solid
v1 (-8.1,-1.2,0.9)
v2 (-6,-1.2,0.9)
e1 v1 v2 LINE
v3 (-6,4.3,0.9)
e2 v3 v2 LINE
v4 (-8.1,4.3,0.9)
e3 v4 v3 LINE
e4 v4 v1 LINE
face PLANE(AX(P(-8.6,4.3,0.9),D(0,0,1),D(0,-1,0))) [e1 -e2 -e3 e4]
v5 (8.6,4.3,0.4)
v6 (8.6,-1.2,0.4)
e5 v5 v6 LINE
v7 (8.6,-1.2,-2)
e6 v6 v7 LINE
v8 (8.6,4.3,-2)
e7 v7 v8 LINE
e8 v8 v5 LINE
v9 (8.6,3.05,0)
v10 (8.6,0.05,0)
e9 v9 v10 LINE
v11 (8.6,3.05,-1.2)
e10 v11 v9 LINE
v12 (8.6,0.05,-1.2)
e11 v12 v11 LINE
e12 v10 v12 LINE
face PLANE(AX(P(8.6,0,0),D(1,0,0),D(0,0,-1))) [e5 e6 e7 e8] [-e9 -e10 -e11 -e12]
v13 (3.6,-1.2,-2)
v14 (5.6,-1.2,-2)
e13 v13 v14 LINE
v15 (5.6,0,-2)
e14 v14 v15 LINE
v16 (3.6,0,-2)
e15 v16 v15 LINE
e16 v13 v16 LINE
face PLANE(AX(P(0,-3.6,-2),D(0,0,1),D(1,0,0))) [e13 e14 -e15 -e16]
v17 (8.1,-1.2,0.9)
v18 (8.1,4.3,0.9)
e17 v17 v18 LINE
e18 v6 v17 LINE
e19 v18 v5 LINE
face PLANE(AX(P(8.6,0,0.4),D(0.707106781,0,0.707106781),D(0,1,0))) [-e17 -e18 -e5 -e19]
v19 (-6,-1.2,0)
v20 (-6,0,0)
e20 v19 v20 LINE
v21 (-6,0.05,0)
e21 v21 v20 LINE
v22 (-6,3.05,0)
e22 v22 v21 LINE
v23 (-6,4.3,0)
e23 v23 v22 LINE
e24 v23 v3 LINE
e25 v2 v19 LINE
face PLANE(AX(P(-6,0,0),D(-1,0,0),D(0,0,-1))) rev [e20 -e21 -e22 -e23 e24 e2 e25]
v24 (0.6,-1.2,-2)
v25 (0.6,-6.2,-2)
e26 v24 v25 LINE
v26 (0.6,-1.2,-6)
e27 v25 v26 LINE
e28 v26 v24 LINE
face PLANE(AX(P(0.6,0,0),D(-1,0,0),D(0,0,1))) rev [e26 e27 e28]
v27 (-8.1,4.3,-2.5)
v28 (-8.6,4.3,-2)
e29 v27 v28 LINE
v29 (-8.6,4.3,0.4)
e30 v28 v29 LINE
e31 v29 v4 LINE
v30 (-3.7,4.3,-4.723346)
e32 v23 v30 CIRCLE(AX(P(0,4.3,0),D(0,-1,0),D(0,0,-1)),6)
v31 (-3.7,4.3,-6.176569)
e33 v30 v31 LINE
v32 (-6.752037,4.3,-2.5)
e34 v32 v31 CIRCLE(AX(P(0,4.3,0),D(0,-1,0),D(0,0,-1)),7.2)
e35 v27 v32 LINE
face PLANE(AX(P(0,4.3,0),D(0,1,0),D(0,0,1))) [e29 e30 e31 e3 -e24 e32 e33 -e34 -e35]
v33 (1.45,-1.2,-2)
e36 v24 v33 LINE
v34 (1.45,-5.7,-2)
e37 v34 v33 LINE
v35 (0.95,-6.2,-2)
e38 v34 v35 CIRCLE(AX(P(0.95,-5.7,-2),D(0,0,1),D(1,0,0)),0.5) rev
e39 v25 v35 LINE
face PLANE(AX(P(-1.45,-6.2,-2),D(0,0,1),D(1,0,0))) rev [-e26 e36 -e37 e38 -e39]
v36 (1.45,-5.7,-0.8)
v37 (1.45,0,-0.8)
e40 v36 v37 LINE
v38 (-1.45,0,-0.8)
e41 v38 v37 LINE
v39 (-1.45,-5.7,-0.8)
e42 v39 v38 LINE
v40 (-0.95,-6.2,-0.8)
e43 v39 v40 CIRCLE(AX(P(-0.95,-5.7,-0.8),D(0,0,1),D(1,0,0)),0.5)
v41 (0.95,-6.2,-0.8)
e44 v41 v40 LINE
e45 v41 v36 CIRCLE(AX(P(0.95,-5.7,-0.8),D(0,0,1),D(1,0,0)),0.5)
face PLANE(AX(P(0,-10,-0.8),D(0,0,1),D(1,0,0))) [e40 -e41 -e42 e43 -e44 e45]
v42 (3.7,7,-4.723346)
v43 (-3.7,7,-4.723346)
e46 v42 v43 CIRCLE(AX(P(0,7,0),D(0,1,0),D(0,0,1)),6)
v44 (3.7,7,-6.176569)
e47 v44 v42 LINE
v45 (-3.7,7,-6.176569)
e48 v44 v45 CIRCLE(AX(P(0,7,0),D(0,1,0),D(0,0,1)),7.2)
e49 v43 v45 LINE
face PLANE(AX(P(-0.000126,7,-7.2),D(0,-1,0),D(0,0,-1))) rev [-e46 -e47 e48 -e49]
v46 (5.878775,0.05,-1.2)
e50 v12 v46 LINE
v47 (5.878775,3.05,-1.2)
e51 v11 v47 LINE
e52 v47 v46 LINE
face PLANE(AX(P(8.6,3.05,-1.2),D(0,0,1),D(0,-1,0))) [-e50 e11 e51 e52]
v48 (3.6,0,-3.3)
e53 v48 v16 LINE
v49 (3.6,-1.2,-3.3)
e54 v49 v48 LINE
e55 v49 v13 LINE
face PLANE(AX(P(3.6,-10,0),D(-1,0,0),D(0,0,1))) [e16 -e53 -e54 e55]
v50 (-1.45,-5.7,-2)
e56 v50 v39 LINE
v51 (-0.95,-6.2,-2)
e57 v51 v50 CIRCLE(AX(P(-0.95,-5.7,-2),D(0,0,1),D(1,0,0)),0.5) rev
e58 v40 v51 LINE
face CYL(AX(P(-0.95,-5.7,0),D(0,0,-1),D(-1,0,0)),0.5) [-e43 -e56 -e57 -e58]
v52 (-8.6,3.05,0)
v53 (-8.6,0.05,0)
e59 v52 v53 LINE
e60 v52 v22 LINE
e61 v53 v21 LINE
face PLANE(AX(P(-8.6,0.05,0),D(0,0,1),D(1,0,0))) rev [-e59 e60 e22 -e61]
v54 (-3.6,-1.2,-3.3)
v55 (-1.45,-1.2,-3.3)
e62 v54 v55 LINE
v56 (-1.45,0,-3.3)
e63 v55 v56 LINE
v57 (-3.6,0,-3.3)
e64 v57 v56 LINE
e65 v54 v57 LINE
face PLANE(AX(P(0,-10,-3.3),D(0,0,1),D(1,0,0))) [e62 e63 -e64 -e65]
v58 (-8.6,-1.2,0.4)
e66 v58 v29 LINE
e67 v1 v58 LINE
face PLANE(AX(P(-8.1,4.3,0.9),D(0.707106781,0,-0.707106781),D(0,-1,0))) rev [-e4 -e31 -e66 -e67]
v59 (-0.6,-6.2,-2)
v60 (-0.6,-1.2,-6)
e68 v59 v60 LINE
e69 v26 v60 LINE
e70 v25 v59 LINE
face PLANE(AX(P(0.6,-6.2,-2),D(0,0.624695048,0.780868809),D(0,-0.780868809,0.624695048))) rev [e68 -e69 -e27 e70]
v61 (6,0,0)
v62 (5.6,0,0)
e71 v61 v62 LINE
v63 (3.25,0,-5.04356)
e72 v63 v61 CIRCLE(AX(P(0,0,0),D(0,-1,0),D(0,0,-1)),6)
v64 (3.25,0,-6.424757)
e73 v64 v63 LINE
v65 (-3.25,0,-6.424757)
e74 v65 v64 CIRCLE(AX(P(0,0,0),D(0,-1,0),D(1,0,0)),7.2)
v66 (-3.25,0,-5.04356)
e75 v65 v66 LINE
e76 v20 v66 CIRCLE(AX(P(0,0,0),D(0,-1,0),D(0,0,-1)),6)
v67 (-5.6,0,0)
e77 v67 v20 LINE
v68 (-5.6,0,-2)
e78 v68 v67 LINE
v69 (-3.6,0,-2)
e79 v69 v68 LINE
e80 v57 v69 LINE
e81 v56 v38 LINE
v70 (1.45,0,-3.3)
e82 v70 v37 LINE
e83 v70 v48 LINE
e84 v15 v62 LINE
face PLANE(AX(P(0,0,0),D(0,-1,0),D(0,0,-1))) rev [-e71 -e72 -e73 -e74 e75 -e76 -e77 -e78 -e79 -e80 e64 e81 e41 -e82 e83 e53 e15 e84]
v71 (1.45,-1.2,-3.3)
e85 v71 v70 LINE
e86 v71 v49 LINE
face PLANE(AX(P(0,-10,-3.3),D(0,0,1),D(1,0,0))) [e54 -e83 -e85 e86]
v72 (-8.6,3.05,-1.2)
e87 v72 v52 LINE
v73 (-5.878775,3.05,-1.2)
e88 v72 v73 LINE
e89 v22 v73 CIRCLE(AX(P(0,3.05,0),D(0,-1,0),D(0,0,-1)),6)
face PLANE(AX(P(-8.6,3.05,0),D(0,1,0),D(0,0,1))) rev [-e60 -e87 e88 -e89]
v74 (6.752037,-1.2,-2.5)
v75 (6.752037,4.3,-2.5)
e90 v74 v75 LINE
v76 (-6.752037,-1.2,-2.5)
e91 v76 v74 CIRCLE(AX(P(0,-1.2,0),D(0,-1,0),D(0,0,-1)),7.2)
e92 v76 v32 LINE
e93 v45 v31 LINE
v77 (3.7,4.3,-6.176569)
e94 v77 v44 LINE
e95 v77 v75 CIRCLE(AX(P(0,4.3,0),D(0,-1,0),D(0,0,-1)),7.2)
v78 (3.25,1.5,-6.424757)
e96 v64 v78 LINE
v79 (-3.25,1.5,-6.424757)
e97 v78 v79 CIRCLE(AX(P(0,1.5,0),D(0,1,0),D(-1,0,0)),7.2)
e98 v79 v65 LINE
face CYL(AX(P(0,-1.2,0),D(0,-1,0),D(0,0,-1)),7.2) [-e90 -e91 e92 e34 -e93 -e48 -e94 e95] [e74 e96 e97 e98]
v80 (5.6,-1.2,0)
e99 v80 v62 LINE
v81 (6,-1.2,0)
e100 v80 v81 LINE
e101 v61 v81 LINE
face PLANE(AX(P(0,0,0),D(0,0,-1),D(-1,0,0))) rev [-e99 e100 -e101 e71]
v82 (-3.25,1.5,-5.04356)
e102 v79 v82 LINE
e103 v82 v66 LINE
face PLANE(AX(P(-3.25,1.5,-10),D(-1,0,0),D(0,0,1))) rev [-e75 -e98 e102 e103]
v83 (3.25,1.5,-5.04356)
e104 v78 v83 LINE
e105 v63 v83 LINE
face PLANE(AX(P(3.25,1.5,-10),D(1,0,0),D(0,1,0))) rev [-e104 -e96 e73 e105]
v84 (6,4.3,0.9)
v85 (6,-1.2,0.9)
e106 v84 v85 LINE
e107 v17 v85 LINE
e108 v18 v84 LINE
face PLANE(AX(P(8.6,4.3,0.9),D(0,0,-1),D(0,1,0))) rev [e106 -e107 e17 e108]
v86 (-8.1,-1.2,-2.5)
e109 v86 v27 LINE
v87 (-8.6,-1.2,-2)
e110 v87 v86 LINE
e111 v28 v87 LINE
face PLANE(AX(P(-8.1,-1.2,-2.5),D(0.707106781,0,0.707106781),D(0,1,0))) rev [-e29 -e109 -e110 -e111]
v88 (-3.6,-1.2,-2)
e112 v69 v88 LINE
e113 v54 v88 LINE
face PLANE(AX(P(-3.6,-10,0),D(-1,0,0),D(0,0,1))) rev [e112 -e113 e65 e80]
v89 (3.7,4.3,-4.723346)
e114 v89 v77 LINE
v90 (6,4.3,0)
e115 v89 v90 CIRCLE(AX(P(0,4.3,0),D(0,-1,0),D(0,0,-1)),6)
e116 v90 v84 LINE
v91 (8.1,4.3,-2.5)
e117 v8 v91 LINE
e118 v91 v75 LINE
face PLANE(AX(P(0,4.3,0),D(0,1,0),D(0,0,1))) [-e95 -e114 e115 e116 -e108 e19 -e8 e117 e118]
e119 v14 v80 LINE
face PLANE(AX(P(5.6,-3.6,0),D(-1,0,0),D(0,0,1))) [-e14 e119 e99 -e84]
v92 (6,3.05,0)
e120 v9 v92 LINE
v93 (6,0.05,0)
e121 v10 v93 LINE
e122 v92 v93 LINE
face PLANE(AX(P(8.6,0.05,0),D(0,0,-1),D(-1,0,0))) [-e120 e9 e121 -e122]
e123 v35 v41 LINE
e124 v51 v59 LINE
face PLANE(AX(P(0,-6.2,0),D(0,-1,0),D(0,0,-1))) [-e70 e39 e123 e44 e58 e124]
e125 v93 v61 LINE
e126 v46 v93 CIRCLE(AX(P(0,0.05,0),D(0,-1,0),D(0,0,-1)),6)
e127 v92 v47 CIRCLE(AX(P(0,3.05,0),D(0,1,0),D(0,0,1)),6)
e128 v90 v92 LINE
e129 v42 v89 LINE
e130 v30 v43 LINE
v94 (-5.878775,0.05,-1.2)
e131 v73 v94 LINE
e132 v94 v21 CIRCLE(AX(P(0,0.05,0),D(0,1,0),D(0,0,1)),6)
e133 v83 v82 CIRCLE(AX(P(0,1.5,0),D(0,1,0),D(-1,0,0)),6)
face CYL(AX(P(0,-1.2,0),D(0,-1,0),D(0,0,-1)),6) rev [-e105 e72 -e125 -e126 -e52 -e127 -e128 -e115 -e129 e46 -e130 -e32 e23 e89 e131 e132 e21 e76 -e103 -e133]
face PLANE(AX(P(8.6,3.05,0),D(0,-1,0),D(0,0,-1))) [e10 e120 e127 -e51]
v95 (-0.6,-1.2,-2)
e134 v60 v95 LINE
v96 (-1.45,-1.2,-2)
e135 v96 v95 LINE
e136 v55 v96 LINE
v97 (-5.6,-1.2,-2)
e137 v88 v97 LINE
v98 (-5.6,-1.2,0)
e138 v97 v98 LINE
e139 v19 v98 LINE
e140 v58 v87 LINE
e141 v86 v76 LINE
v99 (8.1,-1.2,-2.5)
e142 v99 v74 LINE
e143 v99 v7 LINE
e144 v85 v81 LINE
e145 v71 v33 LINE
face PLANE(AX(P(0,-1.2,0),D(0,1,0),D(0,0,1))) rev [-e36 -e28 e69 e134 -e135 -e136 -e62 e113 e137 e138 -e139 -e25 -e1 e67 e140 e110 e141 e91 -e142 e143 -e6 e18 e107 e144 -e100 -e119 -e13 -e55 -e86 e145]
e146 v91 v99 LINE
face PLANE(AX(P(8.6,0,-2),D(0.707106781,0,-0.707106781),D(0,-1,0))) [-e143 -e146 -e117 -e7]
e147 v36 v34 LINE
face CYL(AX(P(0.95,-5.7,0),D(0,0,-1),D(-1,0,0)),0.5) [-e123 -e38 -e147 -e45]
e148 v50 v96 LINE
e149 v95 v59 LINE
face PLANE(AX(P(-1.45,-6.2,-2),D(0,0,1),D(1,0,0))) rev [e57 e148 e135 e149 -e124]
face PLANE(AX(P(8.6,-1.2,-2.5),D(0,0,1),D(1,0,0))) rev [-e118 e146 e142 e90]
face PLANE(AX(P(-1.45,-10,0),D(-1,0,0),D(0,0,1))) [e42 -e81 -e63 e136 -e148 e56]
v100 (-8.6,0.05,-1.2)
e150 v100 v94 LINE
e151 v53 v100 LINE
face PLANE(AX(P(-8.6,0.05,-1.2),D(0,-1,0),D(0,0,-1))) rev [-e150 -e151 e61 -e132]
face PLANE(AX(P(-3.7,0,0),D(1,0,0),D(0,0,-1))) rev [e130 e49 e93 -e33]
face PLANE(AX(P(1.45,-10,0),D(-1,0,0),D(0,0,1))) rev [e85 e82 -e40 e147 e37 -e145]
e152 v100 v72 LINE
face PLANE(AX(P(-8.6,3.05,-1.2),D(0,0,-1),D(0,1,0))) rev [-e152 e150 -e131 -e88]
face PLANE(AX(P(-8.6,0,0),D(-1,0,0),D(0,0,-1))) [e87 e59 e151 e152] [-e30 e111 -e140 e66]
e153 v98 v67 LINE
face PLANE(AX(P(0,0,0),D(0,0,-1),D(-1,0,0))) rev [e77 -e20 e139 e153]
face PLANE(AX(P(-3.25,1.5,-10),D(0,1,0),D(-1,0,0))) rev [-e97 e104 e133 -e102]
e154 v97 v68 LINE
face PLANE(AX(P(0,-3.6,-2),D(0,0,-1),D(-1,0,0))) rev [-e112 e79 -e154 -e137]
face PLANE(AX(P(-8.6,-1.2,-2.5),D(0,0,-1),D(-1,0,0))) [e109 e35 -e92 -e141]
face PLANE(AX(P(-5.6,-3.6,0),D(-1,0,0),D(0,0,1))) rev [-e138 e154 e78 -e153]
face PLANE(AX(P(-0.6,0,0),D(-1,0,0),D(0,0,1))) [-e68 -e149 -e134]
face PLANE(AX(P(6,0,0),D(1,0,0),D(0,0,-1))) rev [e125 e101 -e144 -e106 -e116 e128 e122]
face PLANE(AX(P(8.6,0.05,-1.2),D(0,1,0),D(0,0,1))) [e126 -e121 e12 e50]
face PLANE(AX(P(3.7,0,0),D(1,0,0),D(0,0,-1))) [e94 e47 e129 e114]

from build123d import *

# Parameters (mm, degrees)
SKETCH1_W                = 6
SKETCH1_H                = 1.2
SKETCH1_W_2              = 1.2
SKETCH1_H_2              = 4.3
REVOLVE1_ANGLE           = 180
REVOLVE2_START           = 4.3
REVOLVE2_DEPTH           = 2.7
SKETCH3_W                = 6.5
SKETCH3_H                = 1.5
CUT_EXTRUDE1_DEPTH       = 10
CUT_EXTRUDE2_DEPTH       = 10
SKETCH7_W                = 2.9
SKETCH7_H                = 1.2
BOSS_EXTRUDE3_DEPTH      = 5
BOSS_EXTRUDE4_DEPTH      = 0.6
FILLET1_R                = 0.5
SKETCH9_W                = 3.4
SKETCH9_H                = 5.5
SKETCH9_W_2              = 1.2
SKETCH9_H_2              = 3
BOSS_EXTRUDE5_DEPTH      = 2.6
SKETCH11_W               = 1.2
SKETCH11_H               = 3
CUT_EXTRUDE3_DEPTH       = 3.6
CHAMFER2_SIZE            = 0.5
CHAMFER3_SIZE            = 0.5
CHAMFER2_OF_MIRROR2_SIZE = 0.5
CHAMFER3_OF_MIRROR2_SIZE = 0.5
SKETCH5_W                = 2
SKETCH5_H                = 2
CUT_EXTRUDE4_DEPTH       = 3.6


# Read off the part's stored shape, not the designer's step: Revolve2
with BuildPart() as part:
    # Sketch1 → Revolve1 (revolve)
    with BuildSketch(Plane.XY):
        with Locations((3, -0.6)):
            Rectangle(SKETCH1_W, SKETCH1_H)
        with Locations((6.6, -0.6)):
            Rectangle(SKETCH1_W_2, SKETCH1_H)
        with Locations((6.6, 2.15)):
            Rectangle(SKETCH1_W_2, SKETCH1_H_2)
    revolve(axis=Axis((0, -1.2, 0), (0, 1, 0)), revolution_arc=REVOLVE1_ANGLE)

    # Revolve2 outline → Revolve2 (add)
    with BuildSketch(Plane(origin=(0, 0, 0), x_dir=(1, 0, 0), z_dir=(0, 1, 0)).offset(REVOLVE2_START)):
        with BuildLine():
            ThreePointArc((3.7, 6.176568627), (0, 7.2), (-3.7, 6.176568627))
            Line((-3.7, 6.176568627), (-3.7, 4.723346271))
            ThreePointArc((-3.7, 4.723346271), (0, 6), (3.7, 4.723346271))
            Line((3.7, 4.723346271), (3.7, 6.176568627))
        make_face()
    extrude(amount=REVOLVE2_DEPTH)

    # Sketch3 → Cut-Extrude1 (cut)
    with BuildSketch(Plane.XY):
        with Locations((0, 0.75)):
            Rectangle(SKETCH3_W, SKETCH3_H)
    extrude(amount=-CUT_EXTRUDE1_DEPTH, mode=Mode.SUBTRACT)

    # Sketch4 → Cut-Extrude2 (cut)
    with BuildSketch(Plane(origin=(0, 0, 0), x_dir=(1, 0, 0), z_dir=(0, 1, 0))):
        Polygon((-1.45, 3.3), (-3.6, 3.3), (-3.6, 0), (3.6, 0), (3.6, 3.3), (1.45, 3.3), (1.45, 0.8), (-1.45, 0.8), align=None)
    extrude(amount=-CUT_EXTRUDE2_DEPTH, mode=Mode.SUBTRACT)

    # Sketch7 → Boss-Extrude3 (add)
    with BuildSketch(Plane.XZ.offset(1.2)):
        with Locations((0, -1.4)):
            Rectangle(SKETCH7_W, SKETCH7_H)
    extrude(amount=BOSS_EXTRUDE3_DEPTH)

    # Sketch8 → Boss-Extrude4 (add, symmetric)
    with BuildSketch(Plane(origin=(0, 0, 0), x_dir=(0, 0, -1), z_dir=(1, 0, 0))):
        Polygon((2, -6.2), (6, -1.2), (2, -1.2), align=None)
    extrude(amount=BOSS_EXTRUDE4_DEPTH, both=True)

    # Fillet1
    fillet1_edges = [part.edges().sort_by_distance(p)[0] for p in [
        (-1.45, -6.2, -1.4),
        (1.45, -6.2, -1.4),
    ]]
    fillet(fillet1_edges, radius=FILLET1_R)

    # Sketch9 → Boss-Extrude5 (add)
    with BuildSketch(Plane(origin=(6, 0, 0), x_dir=(0, 0, -1), z_dir=(1, 0, 0))):
        with Locations((0.8, 1.55)):
            Rectangle(SKETCH9_W, SKETCH9_H)
        with Locations((0.6, 1.55)):
            Rectangle(SKETCH9_W_2, SKETCH9_H_2, mode=Mode.SUBTRACT)
    boss_extrude5 = extrude(amount=BOSS_EXTRUDE5_DEPTH)

    # Sketch11 → Cut-Extrude3 (cut)
    with BuildSketch(Plane(origin=(8.6, 0, 0), x_dir=(0, 0, -1), z_dir=(1, 0, 0))):
        with Locations((0.6, 1.55)):
            Rectangle(SKETCH11_W, SKETCH11_H)
    cut_extrude3 = extrude(amount=-CUT_EXTRUDE3_DEPTH, mode=Mode.SUBTRACT)

    # Chamfer2
    chamfer2_edges = [part.edges().sort_by_distance(p)[0] for p in [
        (8.6, 1.55, 0.9),
    ]]
    chamfer(chamfer2_edges, length=CHAMFER2_SIZE)

    # Chamfer3
    chamfer3_edges = [part.edges().sort_by_distance(p)[0] for p in [
        (8.6, 1.55, -2.5),
    ]]
    chamfer(chamfer3_edges, length=CHAMFER3_SIZE)

    # Mirror2: Boss-Extrude5, Cut-Extrude3 across plane
    add(boss_extrude5.mirror(Plane(origin=(0, 0, 0), x_dir=(0, 0, 1), z_dir=(1, 0, 0))))
    add(cut_extrude3.mirror(Plane(origin=(0, 0, 0), x_dir=(0, 0, 1), z_dir=(1, 0, 0))), mode=Mode.SUBTRACT)

    # Chamfer2 of Mirror2
    chamfer2_of_mirror2_edges = [part.edges().sort_by_distance(p)[0] for p in [
        (-8.6, 1.55, 0.9),
    ]]
    chamfer(chamfer2_of_mirror2_edges, length=CHAMFER2_OF_MIRROR2_SIZE)

    # Chamfer3 of Mirror2
    chamfer3_of_mirror2_edges = [part.edges().sort_by_distance(p)[0] for p in [
        (-8.6, 1.55, -2.5),
    ]]
    chamfer(chamfer3_of_mirror2_edges, length=CHAMFER3_OF_MIRROR2_SIZE)

    # Sketch5 → Cut-Extrude4 (cut)
    with BuildSketch(Plane(origin=(0, 0, 0), x_dir=(1, 0, 0), z_dir=(0, 1, 0))):
        with Locations((4.6, 1)):
            Rectangle(SKETCH5_W, SKETCH5_H)
        with Locations((-4.6, 1)):
            Rectangle(SKETCH5_W, SKETCH5_H)
    extrude(amount=-CUT_EXTRUDE4_DEPTH, mode=Mode.SUBTRACT)


solid = part.part
